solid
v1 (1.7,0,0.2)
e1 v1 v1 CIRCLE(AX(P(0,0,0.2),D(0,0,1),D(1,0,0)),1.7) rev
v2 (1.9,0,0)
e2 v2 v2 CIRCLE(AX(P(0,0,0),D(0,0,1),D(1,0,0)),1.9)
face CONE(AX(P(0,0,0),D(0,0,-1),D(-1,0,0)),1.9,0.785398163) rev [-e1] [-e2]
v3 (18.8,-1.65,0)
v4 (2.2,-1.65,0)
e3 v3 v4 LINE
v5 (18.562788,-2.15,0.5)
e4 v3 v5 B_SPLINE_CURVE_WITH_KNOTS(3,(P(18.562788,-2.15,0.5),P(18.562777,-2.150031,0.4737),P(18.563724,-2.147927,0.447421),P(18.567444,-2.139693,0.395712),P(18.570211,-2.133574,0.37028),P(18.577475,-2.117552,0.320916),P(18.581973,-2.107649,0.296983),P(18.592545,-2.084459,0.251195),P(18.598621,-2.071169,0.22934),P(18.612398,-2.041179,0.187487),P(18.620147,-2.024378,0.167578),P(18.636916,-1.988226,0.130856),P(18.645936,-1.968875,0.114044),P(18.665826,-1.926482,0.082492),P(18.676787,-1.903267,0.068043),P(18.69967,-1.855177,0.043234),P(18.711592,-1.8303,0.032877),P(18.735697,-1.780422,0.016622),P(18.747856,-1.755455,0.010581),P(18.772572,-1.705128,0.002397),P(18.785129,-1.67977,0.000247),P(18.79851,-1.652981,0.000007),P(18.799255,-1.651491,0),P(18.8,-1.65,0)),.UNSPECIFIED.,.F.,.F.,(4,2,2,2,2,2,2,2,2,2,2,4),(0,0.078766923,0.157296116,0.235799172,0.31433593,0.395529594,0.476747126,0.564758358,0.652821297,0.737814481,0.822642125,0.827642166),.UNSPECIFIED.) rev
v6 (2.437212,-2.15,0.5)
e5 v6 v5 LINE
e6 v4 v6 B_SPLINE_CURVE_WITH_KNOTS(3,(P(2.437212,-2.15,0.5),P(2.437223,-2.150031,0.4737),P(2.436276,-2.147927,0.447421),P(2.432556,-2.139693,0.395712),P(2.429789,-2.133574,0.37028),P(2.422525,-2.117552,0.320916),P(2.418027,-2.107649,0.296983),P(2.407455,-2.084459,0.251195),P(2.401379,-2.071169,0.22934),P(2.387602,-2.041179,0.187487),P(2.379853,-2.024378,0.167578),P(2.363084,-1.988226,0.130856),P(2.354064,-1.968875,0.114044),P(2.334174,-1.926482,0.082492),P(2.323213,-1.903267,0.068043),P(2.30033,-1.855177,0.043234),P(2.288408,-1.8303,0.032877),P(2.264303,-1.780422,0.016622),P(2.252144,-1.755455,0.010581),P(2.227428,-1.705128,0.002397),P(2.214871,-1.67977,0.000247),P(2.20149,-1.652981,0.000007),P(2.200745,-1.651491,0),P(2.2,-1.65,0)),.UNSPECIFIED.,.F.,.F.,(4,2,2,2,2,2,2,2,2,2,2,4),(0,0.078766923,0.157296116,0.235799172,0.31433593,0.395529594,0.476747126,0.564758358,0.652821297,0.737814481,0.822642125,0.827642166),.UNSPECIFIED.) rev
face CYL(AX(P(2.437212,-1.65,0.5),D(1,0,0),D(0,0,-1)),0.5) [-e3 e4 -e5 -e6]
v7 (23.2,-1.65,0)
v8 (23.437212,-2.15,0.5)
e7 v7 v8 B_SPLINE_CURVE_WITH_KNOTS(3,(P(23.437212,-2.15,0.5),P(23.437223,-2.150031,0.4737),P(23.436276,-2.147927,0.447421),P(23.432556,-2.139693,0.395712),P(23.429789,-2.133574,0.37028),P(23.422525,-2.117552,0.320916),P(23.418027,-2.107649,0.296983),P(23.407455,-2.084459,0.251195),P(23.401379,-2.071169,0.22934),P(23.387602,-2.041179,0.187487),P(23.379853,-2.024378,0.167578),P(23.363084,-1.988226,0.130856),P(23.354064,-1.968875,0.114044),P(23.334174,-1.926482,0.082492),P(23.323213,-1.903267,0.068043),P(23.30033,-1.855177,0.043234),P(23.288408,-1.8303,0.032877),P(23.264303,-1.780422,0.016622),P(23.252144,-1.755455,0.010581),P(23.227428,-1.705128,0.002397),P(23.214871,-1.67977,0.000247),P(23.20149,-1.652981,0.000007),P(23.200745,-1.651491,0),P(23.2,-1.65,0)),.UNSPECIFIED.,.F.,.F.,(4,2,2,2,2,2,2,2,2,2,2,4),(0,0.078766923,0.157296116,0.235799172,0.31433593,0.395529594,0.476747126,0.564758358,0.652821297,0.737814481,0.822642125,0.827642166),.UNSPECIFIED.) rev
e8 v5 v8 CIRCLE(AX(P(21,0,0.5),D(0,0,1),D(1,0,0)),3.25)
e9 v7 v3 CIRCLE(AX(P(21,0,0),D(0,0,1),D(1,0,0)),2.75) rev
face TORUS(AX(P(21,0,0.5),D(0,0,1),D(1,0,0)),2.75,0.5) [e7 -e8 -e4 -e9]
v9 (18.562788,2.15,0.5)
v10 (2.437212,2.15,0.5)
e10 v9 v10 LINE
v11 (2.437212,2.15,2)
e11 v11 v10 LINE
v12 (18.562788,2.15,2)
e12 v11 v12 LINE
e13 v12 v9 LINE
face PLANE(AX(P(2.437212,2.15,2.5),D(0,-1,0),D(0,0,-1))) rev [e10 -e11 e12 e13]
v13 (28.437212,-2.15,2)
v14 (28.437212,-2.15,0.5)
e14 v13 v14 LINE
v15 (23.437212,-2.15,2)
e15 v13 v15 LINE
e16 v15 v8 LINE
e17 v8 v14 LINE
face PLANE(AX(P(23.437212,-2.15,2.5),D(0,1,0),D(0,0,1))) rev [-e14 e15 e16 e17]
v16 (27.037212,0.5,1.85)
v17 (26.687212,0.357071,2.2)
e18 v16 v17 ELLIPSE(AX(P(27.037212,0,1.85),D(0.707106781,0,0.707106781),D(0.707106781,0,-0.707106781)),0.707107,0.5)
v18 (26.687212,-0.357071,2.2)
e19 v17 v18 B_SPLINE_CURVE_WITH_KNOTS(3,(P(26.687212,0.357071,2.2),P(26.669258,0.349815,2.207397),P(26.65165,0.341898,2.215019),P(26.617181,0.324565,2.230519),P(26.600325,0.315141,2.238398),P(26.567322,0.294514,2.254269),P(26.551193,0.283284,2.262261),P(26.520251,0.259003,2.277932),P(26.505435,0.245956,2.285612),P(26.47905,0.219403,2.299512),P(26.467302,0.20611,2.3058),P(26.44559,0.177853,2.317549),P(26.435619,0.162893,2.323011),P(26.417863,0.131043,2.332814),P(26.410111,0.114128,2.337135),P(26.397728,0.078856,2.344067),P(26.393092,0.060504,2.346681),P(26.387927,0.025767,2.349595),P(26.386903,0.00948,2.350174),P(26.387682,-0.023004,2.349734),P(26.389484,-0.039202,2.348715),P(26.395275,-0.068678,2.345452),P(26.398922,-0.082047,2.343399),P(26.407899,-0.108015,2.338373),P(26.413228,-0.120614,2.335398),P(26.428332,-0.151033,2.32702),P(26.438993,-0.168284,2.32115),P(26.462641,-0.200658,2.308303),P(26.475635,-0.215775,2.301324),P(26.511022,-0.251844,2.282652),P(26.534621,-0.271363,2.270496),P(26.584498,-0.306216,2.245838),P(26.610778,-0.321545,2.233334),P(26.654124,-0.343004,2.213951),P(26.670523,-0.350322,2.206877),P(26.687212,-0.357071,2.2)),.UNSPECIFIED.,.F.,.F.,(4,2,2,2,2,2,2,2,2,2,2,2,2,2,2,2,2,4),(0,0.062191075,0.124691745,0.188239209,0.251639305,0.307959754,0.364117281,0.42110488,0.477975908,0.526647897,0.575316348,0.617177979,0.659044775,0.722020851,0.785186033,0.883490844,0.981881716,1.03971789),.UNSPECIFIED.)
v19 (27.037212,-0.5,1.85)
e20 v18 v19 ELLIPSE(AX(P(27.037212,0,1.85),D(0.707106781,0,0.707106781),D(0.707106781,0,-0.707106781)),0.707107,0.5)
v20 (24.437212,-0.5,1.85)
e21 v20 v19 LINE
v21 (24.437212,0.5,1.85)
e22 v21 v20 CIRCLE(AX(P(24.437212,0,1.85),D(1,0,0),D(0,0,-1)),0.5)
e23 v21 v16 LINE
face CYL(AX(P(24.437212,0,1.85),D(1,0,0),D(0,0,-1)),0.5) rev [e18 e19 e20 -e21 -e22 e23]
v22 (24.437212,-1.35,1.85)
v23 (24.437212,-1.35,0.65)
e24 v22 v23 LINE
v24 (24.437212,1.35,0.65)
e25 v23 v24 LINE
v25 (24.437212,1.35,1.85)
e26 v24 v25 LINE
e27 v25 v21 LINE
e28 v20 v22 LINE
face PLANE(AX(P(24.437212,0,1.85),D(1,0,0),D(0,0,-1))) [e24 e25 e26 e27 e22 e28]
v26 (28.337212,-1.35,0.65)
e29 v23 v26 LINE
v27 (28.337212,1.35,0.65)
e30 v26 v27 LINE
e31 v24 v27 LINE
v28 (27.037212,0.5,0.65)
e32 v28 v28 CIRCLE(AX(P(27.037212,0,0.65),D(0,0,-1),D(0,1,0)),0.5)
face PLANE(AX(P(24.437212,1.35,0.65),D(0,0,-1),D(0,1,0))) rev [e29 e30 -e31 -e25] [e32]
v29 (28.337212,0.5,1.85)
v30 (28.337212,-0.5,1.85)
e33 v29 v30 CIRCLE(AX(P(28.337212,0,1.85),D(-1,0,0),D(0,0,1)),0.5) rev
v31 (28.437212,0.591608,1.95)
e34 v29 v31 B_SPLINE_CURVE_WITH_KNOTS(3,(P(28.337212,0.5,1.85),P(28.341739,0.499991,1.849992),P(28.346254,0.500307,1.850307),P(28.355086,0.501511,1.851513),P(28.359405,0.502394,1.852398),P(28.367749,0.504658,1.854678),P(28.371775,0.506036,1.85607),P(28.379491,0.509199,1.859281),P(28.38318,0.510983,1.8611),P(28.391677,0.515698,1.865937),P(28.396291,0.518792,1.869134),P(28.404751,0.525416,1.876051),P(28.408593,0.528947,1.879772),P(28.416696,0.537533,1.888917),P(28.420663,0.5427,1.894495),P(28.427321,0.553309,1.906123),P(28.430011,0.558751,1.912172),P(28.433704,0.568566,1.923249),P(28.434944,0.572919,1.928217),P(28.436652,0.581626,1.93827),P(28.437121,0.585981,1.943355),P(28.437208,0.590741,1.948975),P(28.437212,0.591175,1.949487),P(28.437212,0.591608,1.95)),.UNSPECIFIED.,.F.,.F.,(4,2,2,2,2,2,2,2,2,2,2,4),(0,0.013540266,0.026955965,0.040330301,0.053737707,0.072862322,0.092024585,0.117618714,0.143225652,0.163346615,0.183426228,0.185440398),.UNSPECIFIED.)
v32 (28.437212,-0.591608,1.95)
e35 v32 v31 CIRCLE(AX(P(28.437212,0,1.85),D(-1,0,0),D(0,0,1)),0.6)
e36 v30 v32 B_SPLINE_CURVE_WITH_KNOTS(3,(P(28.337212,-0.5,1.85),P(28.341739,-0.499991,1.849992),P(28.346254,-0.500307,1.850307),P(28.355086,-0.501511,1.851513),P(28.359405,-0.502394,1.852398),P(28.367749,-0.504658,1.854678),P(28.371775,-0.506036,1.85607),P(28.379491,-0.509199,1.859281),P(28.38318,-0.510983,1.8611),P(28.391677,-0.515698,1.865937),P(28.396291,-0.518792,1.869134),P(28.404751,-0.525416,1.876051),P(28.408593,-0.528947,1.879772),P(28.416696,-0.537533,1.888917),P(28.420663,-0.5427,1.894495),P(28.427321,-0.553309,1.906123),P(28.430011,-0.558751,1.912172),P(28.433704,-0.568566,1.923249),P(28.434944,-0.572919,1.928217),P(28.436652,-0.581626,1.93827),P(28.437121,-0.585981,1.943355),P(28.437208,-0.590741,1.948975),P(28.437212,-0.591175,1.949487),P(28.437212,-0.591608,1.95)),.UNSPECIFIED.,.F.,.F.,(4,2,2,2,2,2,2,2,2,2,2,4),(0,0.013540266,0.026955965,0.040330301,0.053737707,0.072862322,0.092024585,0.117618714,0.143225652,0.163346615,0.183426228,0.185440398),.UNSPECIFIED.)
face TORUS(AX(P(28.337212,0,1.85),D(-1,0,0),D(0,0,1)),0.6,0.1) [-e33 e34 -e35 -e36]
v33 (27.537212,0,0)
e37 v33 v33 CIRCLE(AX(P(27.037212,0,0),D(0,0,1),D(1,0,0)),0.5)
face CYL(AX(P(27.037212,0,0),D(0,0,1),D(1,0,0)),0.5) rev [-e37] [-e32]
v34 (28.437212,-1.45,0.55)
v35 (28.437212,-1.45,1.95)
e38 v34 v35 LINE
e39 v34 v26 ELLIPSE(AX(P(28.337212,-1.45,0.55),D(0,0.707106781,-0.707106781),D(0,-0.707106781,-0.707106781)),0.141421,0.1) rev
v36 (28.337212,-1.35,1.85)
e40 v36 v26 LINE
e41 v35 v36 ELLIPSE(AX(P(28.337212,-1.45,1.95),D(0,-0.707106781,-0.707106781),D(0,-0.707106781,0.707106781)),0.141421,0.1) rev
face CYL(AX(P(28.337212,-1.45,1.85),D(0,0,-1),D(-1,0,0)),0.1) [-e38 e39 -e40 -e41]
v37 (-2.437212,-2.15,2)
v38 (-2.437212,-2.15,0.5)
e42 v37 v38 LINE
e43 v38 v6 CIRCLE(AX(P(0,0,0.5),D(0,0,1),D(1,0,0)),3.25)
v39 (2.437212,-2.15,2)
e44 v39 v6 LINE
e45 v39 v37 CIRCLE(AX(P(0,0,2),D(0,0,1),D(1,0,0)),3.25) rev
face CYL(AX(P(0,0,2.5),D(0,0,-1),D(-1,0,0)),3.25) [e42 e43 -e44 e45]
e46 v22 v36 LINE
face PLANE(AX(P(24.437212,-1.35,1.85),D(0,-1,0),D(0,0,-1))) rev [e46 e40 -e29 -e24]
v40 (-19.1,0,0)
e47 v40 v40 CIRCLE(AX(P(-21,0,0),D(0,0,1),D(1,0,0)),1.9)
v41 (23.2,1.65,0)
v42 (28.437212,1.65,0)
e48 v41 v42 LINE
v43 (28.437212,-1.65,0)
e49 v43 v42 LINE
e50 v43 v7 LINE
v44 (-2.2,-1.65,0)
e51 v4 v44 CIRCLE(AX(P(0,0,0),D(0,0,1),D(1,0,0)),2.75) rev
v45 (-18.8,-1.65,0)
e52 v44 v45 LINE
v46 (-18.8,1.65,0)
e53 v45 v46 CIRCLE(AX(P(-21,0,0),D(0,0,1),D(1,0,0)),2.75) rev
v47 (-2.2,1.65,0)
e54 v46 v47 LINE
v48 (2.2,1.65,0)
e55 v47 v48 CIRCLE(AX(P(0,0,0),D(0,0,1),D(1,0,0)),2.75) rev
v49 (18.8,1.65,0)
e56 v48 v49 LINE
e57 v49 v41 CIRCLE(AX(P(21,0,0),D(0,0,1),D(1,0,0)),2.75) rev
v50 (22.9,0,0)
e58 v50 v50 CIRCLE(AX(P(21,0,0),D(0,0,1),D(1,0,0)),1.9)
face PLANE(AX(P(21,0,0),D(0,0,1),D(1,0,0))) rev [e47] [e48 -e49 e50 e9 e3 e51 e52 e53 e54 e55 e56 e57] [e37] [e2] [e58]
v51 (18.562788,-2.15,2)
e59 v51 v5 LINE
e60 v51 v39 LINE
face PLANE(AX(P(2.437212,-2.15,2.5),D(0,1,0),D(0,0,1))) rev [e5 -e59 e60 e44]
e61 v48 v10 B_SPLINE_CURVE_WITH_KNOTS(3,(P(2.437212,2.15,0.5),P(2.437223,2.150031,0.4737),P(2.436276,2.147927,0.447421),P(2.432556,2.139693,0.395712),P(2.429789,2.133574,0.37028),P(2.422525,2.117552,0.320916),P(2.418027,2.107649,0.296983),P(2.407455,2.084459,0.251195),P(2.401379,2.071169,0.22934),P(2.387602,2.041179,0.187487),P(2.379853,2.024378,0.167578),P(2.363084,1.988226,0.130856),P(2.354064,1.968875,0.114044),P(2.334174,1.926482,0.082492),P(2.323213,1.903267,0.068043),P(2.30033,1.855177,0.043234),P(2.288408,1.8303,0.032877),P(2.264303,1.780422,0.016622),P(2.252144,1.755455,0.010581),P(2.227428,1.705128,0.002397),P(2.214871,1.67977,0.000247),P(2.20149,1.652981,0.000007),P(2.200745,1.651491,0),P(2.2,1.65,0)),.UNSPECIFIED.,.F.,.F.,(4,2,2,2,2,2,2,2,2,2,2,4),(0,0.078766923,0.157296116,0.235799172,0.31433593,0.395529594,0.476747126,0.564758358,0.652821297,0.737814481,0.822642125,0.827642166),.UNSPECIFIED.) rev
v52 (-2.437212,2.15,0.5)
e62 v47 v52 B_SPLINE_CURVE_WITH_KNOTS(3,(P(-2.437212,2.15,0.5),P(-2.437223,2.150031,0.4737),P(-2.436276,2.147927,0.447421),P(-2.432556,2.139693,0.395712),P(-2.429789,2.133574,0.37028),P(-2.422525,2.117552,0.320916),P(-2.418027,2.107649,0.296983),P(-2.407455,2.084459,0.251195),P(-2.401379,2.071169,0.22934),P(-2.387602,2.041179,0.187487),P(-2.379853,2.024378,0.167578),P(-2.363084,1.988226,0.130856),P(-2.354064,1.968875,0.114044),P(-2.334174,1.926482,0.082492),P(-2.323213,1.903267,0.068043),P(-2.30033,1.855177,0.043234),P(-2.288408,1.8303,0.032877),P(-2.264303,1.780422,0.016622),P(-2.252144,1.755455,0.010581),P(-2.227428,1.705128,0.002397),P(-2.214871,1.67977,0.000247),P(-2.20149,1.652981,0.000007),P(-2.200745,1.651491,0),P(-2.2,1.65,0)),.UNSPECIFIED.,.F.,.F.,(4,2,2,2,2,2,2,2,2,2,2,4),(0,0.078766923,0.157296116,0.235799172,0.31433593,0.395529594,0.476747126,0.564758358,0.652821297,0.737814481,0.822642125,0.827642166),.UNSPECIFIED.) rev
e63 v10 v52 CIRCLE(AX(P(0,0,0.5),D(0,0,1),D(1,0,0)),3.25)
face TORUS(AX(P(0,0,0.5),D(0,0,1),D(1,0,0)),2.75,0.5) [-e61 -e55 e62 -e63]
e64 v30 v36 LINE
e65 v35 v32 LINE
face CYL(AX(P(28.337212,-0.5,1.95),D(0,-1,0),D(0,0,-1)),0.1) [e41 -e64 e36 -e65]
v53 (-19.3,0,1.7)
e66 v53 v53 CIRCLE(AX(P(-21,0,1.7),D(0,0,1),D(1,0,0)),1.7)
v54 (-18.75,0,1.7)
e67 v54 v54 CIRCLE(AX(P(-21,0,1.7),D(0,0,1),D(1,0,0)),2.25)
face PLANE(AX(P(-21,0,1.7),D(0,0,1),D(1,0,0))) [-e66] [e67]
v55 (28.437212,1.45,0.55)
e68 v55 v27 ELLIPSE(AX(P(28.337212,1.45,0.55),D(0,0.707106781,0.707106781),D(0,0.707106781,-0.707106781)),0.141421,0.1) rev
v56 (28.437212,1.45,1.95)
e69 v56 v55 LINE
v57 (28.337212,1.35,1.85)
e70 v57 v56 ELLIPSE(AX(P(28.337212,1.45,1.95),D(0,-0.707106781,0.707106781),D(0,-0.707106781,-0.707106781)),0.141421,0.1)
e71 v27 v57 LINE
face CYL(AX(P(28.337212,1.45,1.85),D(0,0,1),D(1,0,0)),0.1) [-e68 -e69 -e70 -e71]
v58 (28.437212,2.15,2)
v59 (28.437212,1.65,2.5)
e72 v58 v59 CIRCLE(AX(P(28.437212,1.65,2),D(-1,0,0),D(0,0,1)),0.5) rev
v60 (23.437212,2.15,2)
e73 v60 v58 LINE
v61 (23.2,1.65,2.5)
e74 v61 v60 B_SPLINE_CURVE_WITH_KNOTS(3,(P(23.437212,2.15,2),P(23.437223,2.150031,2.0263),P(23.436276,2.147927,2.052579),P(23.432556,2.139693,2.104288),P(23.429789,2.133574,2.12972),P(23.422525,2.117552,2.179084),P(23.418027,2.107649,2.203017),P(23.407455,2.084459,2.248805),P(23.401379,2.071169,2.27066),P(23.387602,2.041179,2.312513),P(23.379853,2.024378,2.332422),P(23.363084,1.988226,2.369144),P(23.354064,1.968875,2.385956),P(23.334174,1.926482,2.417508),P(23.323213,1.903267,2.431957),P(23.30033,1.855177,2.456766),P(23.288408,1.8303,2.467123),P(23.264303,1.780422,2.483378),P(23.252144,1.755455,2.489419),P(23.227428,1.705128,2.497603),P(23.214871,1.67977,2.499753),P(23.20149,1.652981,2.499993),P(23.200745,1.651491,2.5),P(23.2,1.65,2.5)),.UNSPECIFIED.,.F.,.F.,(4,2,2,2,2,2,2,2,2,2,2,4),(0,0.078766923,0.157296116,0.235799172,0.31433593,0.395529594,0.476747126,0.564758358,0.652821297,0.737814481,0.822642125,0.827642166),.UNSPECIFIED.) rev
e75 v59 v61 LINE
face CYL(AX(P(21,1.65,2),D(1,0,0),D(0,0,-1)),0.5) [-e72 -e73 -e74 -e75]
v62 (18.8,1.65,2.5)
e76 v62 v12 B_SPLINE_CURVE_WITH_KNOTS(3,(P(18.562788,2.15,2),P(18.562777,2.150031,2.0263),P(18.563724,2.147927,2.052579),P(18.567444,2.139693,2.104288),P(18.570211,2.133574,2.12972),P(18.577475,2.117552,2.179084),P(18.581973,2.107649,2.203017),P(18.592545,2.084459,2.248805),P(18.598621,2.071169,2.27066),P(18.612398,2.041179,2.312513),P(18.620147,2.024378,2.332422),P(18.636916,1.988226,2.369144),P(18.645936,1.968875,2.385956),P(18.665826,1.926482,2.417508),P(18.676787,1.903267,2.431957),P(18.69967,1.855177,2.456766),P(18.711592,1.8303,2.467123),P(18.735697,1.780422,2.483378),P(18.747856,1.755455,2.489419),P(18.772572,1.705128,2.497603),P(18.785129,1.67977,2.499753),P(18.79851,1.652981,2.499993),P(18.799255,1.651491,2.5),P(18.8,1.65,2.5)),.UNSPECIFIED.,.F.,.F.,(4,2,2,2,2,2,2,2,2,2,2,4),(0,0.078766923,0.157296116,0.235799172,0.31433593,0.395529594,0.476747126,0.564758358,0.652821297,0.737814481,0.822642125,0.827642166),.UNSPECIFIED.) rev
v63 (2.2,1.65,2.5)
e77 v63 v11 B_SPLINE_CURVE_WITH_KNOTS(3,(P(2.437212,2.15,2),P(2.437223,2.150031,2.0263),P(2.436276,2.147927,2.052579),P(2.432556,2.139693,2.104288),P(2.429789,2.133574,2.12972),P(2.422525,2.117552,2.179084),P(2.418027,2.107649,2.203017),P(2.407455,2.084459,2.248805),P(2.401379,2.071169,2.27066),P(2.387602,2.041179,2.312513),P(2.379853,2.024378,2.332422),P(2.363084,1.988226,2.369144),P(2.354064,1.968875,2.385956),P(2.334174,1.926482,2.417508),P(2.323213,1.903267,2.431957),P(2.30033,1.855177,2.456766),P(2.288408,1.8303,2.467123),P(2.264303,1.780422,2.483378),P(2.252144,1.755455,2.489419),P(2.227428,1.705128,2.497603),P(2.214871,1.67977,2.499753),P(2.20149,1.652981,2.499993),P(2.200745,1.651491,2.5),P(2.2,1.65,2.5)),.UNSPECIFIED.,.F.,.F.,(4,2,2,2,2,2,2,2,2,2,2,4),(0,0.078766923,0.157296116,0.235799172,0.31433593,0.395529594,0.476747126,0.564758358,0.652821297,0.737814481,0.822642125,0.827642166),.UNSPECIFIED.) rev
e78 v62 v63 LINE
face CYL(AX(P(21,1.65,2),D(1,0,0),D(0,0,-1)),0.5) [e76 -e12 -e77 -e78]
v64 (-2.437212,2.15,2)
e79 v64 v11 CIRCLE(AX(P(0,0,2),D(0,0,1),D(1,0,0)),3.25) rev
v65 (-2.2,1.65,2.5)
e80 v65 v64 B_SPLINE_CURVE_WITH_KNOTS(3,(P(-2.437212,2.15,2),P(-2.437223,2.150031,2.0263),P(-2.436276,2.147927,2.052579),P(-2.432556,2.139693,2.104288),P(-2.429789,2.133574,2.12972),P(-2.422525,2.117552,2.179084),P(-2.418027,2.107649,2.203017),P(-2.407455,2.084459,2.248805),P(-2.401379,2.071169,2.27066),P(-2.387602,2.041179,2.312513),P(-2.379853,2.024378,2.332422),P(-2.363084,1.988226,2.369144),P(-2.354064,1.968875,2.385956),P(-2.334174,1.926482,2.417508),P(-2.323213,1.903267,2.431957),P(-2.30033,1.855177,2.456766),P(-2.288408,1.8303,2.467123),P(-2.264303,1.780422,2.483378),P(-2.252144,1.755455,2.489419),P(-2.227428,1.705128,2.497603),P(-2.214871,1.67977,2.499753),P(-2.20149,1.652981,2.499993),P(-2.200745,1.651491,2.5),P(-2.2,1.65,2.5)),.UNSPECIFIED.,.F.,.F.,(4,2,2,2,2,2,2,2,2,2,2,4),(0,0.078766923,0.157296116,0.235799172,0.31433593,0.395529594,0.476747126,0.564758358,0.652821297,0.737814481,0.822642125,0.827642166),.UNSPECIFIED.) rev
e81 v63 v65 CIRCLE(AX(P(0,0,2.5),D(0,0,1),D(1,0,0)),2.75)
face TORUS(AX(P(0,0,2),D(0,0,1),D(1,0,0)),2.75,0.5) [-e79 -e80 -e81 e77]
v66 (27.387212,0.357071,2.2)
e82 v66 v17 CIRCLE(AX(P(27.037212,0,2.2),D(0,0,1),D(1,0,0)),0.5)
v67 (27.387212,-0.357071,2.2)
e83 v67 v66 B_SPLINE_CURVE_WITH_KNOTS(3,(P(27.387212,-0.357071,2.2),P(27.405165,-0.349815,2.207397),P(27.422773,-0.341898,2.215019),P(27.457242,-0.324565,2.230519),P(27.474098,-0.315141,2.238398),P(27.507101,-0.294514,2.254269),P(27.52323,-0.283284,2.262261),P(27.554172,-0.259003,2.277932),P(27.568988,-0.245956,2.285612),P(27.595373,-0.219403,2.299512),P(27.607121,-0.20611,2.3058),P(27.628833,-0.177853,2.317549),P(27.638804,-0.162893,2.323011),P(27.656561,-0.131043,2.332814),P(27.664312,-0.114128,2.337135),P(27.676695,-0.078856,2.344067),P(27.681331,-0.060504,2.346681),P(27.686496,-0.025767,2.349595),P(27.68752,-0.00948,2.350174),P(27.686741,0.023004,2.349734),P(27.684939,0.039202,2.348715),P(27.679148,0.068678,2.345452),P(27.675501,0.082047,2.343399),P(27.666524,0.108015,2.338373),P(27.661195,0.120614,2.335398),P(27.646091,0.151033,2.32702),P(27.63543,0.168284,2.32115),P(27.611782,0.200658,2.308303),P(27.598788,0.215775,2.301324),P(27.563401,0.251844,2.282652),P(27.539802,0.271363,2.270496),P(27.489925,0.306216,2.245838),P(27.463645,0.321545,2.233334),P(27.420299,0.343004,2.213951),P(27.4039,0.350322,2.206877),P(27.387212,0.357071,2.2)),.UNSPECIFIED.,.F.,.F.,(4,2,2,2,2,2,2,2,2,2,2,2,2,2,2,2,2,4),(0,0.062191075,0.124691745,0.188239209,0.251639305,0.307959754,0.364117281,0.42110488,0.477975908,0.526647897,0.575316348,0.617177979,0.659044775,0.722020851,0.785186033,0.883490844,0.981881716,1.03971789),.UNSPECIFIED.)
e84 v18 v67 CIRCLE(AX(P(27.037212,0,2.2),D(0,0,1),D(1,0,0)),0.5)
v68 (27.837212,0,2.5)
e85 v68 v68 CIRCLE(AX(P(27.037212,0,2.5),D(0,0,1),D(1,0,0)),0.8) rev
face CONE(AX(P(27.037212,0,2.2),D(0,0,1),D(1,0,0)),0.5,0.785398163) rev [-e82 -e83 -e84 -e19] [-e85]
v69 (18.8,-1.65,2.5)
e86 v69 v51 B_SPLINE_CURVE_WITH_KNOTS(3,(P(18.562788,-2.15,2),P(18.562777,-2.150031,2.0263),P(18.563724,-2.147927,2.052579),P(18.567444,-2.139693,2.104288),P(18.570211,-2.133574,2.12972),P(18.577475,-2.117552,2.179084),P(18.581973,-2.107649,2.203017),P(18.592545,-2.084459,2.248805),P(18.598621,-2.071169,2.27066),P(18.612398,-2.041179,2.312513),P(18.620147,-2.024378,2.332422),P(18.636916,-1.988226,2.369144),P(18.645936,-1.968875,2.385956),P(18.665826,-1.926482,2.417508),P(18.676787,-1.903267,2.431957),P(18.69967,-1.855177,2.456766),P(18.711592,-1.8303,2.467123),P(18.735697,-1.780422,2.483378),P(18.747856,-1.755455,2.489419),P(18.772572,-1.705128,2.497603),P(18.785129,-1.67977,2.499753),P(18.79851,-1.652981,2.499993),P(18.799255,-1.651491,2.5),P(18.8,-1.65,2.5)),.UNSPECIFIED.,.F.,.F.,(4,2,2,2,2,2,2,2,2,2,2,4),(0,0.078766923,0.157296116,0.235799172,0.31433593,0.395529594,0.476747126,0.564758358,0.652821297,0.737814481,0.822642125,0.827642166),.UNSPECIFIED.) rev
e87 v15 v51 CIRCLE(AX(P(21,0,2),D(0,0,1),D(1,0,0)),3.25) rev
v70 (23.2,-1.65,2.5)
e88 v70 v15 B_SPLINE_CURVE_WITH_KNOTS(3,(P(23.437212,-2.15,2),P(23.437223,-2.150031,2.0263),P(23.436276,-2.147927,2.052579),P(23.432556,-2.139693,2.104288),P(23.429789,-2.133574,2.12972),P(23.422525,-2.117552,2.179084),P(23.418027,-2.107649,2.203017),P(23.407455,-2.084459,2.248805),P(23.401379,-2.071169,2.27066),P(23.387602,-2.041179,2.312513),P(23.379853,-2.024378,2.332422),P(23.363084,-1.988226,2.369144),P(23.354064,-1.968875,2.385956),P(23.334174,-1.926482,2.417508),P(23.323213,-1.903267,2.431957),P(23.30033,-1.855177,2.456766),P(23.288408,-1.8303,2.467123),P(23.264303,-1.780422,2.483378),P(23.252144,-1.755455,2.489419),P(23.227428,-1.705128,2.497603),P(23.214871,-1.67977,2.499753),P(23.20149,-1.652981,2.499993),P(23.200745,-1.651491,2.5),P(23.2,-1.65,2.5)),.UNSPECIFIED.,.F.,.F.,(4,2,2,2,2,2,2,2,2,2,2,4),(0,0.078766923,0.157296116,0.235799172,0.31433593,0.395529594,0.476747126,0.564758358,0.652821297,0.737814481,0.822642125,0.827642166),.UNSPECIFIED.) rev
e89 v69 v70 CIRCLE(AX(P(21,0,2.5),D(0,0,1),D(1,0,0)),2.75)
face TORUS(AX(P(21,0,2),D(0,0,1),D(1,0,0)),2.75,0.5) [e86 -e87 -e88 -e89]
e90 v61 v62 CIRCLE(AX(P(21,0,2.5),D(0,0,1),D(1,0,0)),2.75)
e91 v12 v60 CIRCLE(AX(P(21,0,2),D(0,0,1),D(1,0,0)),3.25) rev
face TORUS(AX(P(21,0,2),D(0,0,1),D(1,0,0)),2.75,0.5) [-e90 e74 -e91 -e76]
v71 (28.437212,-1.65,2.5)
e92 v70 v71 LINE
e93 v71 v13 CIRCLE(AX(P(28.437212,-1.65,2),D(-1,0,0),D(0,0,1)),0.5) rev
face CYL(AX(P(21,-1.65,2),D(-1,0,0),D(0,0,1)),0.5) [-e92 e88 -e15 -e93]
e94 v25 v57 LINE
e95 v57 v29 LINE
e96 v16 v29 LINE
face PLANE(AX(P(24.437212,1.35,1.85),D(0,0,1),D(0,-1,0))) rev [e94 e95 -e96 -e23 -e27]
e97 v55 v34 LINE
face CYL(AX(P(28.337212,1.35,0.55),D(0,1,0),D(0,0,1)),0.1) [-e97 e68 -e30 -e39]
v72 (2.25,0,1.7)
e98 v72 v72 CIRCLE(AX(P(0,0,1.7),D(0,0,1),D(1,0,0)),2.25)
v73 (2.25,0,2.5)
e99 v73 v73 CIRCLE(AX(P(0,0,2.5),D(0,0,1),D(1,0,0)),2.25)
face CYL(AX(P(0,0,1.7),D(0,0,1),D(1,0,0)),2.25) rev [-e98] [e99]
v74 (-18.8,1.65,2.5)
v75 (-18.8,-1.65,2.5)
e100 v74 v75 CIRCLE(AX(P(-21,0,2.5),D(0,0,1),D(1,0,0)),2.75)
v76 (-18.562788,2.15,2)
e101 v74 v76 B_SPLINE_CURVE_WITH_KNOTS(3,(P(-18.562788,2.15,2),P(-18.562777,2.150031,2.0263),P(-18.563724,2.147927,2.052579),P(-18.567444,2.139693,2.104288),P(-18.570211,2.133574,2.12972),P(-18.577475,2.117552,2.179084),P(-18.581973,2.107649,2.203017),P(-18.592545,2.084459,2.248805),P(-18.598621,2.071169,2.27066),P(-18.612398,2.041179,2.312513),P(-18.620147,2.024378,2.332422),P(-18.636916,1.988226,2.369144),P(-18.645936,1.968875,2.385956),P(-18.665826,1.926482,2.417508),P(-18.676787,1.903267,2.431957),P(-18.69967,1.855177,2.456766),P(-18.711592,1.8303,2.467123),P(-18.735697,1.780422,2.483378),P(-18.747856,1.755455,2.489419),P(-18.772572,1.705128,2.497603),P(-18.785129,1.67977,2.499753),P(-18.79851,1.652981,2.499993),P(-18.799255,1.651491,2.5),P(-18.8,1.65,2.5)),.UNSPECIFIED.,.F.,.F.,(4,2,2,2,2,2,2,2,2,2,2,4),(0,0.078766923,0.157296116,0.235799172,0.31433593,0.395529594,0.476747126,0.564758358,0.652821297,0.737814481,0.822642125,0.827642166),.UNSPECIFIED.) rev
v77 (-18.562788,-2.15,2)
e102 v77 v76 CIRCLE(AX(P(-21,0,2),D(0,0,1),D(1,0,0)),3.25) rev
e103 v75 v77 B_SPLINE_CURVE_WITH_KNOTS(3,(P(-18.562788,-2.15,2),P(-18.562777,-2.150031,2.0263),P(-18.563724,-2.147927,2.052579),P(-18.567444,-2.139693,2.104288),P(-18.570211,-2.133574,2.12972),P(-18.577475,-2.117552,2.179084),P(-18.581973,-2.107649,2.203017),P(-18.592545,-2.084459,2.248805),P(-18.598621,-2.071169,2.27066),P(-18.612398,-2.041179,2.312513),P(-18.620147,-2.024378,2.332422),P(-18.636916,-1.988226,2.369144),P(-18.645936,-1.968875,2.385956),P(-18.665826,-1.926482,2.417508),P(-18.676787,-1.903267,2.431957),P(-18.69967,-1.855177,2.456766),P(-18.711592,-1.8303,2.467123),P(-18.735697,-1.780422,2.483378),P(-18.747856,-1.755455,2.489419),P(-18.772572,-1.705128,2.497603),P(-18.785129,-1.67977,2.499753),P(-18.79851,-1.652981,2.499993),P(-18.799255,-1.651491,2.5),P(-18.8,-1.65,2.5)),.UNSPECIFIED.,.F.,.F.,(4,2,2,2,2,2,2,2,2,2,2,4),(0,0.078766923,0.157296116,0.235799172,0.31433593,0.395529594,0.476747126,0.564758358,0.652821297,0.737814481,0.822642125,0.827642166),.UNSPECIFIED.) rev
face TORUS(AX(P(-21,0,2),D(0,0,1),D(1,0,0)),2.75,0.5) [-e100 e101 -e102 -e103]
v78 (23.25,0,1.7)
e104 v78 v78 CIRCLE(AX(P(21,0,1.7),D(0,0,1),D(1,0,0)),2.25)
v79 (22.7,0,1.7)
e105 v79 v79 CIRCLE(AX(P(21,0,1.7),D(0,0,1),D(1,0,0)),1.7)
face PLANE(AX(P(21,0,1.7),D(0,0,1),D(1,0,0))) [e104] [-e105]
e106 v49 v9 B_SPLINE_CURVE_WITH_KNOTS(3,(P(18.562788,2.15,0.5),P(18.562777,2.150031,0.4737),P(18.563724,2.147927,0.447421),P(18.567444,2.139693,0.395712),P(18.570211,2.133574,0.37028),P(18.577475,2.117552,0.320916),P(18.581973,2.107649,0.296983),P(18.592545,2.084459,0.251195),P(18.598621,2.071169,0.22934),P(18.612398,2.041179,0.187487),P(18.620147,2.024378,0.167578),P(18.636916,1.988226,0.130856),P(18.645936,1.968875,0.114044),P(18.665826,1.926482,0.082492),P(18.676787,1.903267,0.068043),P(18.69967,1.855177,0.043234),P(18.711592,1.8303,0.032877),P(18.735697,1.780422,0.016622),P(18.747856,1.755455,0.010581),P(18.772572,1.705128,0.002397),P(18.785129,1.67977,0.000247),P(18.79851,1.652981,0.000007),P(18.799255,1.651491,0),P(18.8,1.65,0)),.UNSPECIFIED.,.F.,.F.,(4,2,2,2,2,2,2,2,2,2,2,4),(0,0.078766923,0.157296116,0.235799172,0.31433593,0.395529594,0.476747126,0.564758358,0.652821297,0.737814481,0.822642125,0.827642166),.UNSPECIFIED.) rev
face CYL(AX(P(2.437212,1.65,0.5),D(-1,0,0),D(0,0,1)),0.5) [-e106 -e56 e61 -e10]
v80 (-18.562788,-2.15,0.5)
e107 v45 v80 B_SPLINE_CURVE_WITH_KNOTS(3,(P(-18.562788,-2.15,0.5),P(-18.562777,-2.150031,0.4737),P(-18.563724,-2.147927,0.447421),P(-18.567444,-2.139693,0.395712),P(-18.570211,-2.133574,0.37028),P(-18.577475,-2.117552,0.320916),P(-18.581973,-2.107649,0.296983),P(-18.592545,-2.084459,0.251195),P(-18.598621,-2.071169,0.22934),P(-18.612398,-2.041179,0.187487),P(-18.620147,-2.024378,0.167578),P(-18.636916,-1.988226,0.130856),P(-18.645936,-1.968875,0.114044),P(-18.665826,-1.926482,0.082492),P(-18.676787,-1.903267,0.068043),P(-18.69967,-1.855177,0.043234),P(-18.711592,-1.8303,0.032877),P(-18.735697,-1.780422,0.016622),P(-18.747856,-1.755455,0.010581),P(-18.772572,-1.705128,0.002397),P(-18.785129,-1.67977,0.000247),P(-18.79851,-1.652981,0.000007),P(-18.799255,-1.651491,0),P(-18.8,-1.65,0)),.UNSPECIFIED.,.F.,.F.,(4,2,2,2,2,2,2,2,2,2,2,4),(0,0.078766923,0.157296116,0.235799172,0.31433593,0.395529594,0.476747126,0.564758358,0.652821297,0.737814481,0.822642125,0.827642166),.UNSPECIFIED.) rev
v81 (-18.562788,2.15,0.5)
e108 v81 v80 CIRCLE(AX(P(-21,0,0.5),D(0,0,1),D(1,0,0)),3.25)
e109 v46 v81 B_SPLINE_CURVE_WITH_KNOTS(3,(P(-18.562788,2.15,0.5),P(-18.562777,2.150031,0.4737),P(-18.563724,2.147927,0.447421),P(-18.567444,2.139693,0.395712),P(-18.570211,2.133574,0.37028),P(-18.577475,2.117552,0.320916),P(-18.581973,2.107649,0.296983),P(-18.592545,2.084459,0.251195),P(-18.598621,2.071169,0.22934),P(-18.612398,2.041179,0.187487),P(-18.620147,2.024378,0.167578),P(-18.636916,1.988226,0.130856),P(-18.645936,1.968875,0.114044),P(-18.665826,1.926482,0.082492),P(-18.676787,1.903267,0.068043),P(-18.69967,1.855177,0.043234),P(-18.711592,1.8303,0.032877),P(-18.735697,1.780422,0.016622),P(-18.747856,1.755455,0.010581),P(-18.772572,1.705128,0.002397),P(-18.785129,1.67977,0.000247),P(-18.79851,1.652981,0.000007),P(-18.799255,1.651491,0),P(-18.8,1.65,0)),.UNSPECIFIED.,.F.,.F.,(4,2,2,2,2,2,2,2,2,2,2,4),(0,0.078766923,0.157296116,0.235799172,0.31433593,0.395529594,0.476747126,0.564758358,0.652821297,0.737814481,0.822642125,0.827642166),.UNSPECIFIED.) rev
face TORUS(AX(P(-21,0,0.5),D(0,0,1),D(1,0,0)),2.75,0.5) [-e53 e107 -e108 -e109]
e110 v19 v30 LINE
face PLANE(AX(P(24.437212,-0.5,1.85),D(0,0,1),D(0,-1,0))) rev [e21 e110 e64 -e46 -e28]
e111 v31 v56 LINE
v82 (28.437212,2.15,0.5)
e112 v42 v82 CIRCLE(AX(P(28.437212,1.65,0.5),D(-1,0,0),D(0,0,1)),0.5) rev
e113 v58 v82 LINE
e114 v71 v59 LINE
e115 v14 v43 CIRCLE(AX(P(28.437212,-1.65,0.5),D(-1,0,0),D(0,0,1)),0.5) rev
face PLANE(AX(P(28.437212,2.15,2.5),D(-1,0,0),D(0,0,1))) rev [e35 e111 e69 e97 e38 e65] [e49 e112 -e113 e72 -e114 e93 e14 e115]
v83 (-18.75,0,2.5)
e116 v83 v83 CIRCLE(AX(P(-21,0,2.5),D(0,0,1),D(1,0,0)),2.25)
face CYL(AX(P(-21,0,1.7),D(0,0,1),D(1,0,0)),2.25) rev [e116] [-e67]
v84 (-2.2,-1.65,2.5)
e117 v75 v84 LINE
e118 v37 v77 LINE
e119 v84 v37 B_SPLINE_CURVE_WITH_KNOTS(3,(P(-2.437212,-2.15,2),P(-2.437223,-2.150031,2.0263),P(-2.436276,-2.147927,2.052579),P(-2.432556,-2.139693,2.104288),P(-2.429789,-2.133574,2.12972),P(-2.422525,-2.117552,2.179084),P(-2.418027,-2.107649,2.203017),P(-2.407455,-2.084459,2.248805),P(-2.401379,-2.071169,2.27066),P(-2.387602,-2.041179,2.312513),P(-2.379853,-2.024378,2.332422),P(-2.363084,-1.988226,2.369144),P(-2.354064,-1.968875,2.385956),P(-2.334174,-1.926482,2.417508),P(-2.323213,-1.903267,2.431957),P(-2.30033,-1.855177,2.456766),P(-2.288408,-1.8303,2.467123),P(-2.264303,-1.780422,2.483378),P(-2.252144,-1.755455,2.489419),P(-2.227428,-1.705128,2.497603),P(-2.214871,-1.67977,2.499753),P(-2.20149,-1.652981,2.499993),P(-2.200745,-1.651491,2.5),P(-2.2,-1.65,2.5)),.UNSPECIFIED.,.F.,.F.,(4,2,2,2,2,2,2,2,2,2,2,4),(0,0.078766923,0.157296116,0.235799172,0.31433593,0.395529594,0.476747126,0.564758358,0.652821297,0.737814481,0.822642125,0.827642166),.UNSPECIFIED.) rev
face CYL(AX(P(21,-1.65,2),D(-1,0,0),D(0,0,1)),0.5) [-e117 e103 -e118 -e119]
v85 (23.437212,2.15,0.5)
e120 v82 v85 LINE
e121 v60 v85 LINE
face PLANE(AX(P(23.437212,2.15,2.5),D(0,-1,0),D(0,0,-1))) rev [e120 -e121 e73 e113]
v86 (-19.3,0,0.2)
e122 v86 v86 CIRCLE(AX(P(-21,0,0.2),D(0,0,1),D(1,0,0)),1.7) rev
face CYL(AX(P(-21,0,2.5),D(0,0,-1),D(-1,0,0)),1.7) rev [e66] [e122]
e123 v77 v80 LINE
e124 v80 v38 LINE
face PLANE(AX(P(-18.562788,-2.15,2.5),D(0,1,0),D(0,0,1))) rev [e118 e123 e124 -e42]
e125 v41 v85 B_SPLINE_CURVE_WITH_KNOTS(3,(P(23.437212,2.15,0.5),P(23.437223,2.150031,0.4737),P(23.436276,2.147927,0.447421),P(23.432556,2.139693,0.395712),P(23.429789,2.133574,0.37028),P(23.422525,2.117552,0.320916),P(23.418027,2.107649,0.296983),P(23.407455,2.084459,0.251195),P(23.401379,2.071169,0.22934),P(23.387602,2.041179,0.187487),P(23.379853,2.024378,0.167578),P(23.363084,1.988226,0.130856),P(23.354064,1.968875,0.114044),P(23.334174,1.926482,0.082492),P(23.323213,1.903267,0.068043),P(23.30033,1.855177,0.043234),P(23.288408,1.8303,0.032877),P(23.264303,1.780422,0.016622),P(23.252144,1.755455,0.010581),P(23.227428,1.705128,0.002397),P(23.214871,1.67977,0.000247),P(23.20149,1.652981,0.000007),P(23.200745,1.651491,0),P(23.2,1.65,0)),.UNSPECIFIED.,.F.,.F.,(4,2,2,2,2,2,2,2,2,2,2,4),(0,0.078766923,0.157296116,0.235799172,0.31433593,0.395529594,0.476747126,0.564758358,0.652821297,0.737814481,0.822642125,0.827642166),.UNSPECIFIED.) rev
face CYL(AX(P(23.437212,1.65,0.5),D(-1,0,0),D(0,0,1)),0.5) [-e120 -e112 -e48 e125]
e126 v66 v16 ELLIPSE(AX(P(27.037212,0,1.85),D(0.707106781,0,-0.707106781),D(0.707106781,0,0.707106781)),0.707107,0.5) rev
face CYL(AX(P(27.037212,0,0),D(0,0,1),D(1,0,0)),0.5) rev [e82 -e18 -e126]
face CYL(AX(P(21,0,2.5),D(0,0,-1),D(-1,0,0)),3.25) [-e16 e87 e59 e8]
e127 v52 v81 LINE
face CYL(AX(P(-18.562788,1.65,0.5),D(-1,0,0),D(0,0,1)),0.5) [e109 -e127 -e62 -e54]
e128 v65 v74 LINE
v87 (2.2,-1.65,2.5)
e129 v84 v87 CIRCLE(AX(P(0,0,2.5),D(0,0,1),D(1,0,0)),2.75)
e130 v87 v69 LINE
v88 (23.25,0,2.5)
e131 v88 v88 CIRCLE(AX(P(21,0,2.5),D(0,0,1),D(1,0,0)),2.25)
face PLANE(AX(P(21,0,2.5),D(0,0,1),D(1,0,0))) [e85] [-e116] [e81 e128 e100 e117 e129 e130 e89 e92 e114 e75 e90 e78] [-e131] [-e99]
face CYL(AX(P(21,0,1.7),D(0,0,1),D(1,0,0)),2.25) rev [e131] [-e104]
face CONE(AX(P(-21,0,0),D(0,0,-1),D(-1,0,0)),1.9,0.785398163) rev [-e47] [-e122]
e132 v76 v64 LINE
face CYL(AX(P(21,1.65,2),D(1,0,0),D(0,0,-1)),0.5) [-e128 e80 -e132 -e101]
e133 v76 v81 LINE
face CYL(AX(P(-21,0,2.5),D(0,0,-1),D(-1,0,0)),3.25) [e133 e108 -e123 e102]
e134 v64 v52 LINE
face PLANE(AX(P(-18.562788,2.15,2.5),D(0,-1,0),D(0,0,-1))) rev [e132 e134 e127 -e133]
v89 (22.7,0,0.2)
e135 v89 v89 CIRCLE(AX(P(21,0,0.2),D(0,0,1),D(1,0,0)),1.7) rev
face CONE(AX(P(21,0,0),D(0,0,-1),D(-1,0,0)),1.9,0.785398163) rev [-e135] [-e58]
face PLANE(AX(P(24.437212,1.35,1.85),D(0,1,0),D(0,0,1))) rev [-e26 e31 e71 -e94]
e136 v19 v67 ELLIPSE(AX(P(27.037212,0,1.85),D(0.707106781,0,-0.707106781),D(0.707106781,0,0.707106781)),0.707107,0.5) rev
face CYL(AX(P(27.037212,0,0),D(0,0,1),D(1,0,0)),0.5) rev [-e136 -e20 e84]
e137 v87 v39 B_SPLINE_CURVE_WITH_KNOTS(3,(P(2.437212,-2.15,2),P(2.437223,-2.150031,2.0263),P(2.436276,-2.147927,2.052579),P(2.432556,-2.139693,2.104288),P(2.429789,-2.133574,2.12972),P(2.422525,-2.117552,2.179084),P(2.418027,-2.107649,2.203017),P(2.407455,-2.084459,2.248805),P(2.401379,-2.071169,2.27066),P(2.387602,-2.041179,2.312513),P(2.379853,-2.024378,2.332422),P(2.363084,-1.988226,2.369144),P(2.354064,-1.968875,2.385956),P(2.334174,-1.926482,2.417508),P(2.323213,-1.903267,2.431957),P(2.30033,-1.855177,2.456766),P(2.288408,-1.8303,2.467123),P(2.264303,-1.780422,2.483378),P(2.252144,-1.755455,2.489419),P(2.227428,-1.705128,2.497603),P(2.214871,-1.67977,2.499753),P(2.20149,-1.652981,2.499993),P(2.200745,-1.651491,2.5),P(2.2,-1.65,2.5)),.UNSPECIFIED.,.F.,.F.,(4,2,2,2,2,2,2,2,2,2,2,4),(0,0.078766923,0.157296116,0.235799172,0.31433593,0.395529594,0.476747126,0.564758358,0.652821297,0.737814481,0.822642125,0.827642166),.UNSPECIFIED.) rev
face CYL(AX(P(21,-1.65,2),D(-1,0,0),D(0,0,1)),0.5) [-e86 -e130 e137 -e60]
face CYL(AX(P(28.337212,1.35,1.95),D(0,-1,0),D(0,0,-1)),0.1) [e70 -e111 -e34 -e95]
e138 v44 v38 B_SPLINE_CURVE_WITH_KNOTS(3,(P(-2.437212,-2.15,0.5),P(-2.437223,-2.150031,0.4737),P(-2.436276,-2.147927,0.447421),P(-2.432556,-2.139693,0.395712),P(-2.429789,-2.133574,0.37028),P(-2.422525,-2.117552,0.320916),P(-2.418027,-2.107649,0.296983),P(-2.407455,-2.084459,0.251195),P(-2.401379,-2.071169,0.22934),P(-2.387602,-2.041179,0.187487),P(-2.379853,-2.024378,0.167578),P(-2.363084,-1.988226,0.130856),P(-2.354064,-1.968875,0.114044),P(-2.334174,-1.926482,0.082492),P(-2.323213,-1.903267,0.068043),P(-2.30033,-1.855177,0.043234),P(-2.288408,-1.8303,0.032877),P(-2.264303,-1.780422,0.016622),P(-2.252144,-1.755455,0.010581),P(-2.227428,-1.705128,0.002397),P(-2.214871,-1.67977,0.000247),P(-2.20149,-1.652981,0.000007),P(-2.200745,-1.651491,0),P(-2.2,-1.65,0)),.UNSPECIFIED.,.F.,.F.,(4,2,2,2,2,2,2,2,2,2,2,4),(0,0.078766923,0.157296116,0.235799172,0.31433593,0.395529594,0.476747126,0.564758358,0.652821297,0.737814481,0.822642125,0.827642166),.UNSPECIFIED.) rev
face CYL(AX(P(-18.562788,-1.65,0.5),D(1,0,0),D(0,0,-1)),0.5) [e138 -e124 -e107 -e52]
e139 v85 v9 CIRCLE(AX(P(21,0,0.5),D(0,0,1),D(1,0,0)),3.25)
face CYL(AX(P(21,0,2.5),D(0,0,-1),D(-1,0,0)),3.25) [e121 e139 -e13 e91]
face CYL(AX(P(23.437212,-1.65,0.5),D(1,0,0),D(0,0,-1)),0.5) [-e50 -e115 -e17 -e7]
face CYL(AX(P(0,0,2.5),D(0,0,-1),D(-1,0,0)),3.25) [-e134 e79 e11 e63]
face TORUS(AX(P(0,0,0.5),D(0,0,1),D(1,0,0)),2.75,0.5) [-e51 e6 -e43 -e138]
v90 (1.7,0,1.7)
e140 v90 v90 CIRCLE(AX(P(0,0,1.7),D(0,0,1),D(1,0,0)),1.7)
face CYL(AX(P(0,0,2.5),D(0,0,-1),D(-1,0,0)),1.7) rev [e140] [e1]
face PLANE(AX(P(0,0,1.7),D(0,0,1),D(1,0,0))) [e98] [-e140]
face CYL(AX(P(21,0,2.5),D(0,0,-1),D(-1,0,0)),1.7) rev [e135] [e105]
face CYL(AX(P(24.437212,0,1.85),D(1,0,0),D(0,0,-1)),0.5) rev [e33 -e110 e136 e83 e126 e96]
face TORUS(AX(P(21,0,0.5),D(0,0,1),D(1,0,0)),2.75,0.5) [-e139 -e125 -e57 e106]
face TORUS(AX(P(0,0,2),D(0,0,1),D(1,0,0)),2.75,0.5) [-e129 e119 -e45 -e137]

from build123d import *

# Parameters (mm, degrees)
SKETCH1_R           = 1.7
BOSS_EXTRUDE1_DEPTH = 2.5
SKETCH2_R           = 2.25
CUT_EXTRUDE1_DEPTH  = 0.8
CHAMFER1_SIZE       = 0.2
FILLET1_R           = 0.5
CUT_EXTRUDE2_DEPTH  = 4
FILLET2_R           = 0.1
SKETCH4_R           = 0.5
CUT_EXTRUDE3_DEPTH  = 29.731298369
CHAMFER2_SIZE       = 0.3


with BuildPart() as part:
    # Sketch1 → Boss-Extrude1 (new body)
    with BuildSketch(Plane.XY):
        with BuildLine():
            Line((-18.562788479, 2.15), (-2.437211521, 2.15))
            ThreePointArc((-2.437211521, 2.15), (0, 3.25), (2.437211521, 2.15))
            Line((2.437211521, 2.15), (18.562788479, 2.15))
            ThreePointArc((18.562788479, 2.15), (21, 3.25), (23.437211521, 2.15))
            Line((23.437211521, 2.15), (28.437211521, 2.15))
            Line((28.437211521, 2.15), (28.437211521, -2.15))
            Line((28.437211521, -2.15), (23.437211521, -2.15))
            ThreePointArc((23.437211521, -2.15), (21, -3.25), (18.562788479, -2.15))
            Line((18.562788479, -2.15), (2.437211521, -2.15))
            ThreePointArc((2.437211521, -2.15), (0, -3.25), (-2.437211521, -2.15))
            Line((-2.437211521, -2.15), (-18.562788479, -2.15))
            ThreePointArc((-18.562788479, -2.15), (-24.25, 0), (-18.562788479, 2.15))
        make_face()
        Circle(SKETCH1_R, mode=Mode.SUBTRACT)
        with Locations((-21, 0)):
            Circle(SKETCH1_R, mode=Mode.SUBTRACT)
        with Locations((21, 0)):
            Circle(SKETCH1_R, mode=Mode.SUBTRACT)
    extrude(amount=BOSS_EXTRUDE1_DEPTH)

    # Sketch2 → Cut-Extrude1 (cut)
    with BuildSketch(Plane.XY.offset(2.5)):
        with Locations((-21, 0)):
            Circle(SKETCH2_R)
        Circle(SKETCH2_R)
        with Locations((21, 0)):
            Circle(SKETCH2_R)
    extrude(amount=-CUT_EXTRUDE1_DEPTH, mode=Mode.SUBTRACT)

    # Chamfer1
    chamfer1_edges = [part.edges().sort_by_distance(p)[0] for p in [
        (-1.7, 0, 0),
        (-22.7, 0, 0),
        (19.3, 0, 0),
    ]]
    chamfer(chamfer1_edges, length=CHAMFER1_SIZE)

    # Fillet1
    fillet1_edges = [part.edges().sort_by_distance(p)[0] for p in [
        (0, 3.25, 2.5),
        (25.937211521, 2.15, 0),
        (25.937211521, -2.15, 0),
        (21, -3.25, 0),
        (10.5, -2.15, 0),
        (0, -3.25, 0),
        (-10.5, 2.15, 2.5),
        (-10.5, -2.15, 0),
        (-24.25, 0, 0),
        (-10.5, 2.15, 0),
        (0, 3.25, 0),
        (10.5, 2.15, 0),
        (21, 3.25, 0),
        (-24.25, 0, 2.5),
        (-10.5, -2.15, 2.5),
        (0, -3.25, 2.5),
        (10.5, -2.15, 2.5),
        (21, -3.25, 2.5),
        (25.937211521, -2.15, 2.5),
        (25.937211521, 2.15, 2.5),
        (21, 3.25, 2.5),
        (10.5, 2.15, 2.5),
    ]]
    fillet(fillet1_edges, radius=FILLET1_R)

    # Sketch3 → Cut-Extrude2 (cut)
    with BuildSketch(Plane(origin=(28.437211521, 0, 0), x_dir=(0, 0, -1), z_dir=(1, 0, 0))):
        with BuildLine():
            Line((-1.85, -0.5), (-1.85, -1.35))
            Line((-1.85, -1.35), (-0.65, -1.35))
            Line((-0.65, -1.35), (-0.65, 1.35))
            Line((-0.65, 1.35), (-1.85, 1.35))
            Line((-1.85, 1.35), (-1.85, 0.5))
            ThreePointArc((-1.85, 0.5), (-2.35, 0), (-1.85, -0.5))
        make_face()
    extrude(amount=-CUT_EXTRUDE2_DEPTH, mode=Mode.SUBTRACT)

    # Fillet2
    fillet2_edges = [part.edges().sort_by_distance(p)[0] for p in [
        (28.437211521, 0, 0.65),
        (28.437211521, 1.35, 1.25),
        (28.437211521, 0.925, 1.85),
        (28.437211521, 0, 2.35),
        (28.437211521, -0.925, 1.85),
        (28.437211521, -1.35, 1.25),
    ]]
    fillet(fillet2_edges, radius=FILLET2_R)

    # Sketch4 → Cut-Extrude3 (cut, through all)
    with BuildSketch(Plane.XY.offset(2.5)):
        with Locations((27.037211521, 0)):
            Circle(SKETCH4_R)
    extrude(amount=-CUT_EXTRUDE3_DEPTH, mode=Mode.SUBTRACT)

    # Chamfer2
    # the kernel refuses this chamfer: 0.3 mm, written as the material it takes off along each edge
    with BuildSketch(Plane(origin=(27.037211521, 0, 2.5), x_dir=(1, 0, 0), z_dir=(0, -1, 0))) as chamfer2_piece_1:
        Polygon((0.5 + CHAMFER2_SIZE, 0), (0.5, -CHAMFER2_SIZE), (0.5, 0), align=None)
    revolve(axis=Axis((27.037211521, 0, 2.5), (0, 0, 1)), mode=Mode.SUBTRACT)


solid = part.part
